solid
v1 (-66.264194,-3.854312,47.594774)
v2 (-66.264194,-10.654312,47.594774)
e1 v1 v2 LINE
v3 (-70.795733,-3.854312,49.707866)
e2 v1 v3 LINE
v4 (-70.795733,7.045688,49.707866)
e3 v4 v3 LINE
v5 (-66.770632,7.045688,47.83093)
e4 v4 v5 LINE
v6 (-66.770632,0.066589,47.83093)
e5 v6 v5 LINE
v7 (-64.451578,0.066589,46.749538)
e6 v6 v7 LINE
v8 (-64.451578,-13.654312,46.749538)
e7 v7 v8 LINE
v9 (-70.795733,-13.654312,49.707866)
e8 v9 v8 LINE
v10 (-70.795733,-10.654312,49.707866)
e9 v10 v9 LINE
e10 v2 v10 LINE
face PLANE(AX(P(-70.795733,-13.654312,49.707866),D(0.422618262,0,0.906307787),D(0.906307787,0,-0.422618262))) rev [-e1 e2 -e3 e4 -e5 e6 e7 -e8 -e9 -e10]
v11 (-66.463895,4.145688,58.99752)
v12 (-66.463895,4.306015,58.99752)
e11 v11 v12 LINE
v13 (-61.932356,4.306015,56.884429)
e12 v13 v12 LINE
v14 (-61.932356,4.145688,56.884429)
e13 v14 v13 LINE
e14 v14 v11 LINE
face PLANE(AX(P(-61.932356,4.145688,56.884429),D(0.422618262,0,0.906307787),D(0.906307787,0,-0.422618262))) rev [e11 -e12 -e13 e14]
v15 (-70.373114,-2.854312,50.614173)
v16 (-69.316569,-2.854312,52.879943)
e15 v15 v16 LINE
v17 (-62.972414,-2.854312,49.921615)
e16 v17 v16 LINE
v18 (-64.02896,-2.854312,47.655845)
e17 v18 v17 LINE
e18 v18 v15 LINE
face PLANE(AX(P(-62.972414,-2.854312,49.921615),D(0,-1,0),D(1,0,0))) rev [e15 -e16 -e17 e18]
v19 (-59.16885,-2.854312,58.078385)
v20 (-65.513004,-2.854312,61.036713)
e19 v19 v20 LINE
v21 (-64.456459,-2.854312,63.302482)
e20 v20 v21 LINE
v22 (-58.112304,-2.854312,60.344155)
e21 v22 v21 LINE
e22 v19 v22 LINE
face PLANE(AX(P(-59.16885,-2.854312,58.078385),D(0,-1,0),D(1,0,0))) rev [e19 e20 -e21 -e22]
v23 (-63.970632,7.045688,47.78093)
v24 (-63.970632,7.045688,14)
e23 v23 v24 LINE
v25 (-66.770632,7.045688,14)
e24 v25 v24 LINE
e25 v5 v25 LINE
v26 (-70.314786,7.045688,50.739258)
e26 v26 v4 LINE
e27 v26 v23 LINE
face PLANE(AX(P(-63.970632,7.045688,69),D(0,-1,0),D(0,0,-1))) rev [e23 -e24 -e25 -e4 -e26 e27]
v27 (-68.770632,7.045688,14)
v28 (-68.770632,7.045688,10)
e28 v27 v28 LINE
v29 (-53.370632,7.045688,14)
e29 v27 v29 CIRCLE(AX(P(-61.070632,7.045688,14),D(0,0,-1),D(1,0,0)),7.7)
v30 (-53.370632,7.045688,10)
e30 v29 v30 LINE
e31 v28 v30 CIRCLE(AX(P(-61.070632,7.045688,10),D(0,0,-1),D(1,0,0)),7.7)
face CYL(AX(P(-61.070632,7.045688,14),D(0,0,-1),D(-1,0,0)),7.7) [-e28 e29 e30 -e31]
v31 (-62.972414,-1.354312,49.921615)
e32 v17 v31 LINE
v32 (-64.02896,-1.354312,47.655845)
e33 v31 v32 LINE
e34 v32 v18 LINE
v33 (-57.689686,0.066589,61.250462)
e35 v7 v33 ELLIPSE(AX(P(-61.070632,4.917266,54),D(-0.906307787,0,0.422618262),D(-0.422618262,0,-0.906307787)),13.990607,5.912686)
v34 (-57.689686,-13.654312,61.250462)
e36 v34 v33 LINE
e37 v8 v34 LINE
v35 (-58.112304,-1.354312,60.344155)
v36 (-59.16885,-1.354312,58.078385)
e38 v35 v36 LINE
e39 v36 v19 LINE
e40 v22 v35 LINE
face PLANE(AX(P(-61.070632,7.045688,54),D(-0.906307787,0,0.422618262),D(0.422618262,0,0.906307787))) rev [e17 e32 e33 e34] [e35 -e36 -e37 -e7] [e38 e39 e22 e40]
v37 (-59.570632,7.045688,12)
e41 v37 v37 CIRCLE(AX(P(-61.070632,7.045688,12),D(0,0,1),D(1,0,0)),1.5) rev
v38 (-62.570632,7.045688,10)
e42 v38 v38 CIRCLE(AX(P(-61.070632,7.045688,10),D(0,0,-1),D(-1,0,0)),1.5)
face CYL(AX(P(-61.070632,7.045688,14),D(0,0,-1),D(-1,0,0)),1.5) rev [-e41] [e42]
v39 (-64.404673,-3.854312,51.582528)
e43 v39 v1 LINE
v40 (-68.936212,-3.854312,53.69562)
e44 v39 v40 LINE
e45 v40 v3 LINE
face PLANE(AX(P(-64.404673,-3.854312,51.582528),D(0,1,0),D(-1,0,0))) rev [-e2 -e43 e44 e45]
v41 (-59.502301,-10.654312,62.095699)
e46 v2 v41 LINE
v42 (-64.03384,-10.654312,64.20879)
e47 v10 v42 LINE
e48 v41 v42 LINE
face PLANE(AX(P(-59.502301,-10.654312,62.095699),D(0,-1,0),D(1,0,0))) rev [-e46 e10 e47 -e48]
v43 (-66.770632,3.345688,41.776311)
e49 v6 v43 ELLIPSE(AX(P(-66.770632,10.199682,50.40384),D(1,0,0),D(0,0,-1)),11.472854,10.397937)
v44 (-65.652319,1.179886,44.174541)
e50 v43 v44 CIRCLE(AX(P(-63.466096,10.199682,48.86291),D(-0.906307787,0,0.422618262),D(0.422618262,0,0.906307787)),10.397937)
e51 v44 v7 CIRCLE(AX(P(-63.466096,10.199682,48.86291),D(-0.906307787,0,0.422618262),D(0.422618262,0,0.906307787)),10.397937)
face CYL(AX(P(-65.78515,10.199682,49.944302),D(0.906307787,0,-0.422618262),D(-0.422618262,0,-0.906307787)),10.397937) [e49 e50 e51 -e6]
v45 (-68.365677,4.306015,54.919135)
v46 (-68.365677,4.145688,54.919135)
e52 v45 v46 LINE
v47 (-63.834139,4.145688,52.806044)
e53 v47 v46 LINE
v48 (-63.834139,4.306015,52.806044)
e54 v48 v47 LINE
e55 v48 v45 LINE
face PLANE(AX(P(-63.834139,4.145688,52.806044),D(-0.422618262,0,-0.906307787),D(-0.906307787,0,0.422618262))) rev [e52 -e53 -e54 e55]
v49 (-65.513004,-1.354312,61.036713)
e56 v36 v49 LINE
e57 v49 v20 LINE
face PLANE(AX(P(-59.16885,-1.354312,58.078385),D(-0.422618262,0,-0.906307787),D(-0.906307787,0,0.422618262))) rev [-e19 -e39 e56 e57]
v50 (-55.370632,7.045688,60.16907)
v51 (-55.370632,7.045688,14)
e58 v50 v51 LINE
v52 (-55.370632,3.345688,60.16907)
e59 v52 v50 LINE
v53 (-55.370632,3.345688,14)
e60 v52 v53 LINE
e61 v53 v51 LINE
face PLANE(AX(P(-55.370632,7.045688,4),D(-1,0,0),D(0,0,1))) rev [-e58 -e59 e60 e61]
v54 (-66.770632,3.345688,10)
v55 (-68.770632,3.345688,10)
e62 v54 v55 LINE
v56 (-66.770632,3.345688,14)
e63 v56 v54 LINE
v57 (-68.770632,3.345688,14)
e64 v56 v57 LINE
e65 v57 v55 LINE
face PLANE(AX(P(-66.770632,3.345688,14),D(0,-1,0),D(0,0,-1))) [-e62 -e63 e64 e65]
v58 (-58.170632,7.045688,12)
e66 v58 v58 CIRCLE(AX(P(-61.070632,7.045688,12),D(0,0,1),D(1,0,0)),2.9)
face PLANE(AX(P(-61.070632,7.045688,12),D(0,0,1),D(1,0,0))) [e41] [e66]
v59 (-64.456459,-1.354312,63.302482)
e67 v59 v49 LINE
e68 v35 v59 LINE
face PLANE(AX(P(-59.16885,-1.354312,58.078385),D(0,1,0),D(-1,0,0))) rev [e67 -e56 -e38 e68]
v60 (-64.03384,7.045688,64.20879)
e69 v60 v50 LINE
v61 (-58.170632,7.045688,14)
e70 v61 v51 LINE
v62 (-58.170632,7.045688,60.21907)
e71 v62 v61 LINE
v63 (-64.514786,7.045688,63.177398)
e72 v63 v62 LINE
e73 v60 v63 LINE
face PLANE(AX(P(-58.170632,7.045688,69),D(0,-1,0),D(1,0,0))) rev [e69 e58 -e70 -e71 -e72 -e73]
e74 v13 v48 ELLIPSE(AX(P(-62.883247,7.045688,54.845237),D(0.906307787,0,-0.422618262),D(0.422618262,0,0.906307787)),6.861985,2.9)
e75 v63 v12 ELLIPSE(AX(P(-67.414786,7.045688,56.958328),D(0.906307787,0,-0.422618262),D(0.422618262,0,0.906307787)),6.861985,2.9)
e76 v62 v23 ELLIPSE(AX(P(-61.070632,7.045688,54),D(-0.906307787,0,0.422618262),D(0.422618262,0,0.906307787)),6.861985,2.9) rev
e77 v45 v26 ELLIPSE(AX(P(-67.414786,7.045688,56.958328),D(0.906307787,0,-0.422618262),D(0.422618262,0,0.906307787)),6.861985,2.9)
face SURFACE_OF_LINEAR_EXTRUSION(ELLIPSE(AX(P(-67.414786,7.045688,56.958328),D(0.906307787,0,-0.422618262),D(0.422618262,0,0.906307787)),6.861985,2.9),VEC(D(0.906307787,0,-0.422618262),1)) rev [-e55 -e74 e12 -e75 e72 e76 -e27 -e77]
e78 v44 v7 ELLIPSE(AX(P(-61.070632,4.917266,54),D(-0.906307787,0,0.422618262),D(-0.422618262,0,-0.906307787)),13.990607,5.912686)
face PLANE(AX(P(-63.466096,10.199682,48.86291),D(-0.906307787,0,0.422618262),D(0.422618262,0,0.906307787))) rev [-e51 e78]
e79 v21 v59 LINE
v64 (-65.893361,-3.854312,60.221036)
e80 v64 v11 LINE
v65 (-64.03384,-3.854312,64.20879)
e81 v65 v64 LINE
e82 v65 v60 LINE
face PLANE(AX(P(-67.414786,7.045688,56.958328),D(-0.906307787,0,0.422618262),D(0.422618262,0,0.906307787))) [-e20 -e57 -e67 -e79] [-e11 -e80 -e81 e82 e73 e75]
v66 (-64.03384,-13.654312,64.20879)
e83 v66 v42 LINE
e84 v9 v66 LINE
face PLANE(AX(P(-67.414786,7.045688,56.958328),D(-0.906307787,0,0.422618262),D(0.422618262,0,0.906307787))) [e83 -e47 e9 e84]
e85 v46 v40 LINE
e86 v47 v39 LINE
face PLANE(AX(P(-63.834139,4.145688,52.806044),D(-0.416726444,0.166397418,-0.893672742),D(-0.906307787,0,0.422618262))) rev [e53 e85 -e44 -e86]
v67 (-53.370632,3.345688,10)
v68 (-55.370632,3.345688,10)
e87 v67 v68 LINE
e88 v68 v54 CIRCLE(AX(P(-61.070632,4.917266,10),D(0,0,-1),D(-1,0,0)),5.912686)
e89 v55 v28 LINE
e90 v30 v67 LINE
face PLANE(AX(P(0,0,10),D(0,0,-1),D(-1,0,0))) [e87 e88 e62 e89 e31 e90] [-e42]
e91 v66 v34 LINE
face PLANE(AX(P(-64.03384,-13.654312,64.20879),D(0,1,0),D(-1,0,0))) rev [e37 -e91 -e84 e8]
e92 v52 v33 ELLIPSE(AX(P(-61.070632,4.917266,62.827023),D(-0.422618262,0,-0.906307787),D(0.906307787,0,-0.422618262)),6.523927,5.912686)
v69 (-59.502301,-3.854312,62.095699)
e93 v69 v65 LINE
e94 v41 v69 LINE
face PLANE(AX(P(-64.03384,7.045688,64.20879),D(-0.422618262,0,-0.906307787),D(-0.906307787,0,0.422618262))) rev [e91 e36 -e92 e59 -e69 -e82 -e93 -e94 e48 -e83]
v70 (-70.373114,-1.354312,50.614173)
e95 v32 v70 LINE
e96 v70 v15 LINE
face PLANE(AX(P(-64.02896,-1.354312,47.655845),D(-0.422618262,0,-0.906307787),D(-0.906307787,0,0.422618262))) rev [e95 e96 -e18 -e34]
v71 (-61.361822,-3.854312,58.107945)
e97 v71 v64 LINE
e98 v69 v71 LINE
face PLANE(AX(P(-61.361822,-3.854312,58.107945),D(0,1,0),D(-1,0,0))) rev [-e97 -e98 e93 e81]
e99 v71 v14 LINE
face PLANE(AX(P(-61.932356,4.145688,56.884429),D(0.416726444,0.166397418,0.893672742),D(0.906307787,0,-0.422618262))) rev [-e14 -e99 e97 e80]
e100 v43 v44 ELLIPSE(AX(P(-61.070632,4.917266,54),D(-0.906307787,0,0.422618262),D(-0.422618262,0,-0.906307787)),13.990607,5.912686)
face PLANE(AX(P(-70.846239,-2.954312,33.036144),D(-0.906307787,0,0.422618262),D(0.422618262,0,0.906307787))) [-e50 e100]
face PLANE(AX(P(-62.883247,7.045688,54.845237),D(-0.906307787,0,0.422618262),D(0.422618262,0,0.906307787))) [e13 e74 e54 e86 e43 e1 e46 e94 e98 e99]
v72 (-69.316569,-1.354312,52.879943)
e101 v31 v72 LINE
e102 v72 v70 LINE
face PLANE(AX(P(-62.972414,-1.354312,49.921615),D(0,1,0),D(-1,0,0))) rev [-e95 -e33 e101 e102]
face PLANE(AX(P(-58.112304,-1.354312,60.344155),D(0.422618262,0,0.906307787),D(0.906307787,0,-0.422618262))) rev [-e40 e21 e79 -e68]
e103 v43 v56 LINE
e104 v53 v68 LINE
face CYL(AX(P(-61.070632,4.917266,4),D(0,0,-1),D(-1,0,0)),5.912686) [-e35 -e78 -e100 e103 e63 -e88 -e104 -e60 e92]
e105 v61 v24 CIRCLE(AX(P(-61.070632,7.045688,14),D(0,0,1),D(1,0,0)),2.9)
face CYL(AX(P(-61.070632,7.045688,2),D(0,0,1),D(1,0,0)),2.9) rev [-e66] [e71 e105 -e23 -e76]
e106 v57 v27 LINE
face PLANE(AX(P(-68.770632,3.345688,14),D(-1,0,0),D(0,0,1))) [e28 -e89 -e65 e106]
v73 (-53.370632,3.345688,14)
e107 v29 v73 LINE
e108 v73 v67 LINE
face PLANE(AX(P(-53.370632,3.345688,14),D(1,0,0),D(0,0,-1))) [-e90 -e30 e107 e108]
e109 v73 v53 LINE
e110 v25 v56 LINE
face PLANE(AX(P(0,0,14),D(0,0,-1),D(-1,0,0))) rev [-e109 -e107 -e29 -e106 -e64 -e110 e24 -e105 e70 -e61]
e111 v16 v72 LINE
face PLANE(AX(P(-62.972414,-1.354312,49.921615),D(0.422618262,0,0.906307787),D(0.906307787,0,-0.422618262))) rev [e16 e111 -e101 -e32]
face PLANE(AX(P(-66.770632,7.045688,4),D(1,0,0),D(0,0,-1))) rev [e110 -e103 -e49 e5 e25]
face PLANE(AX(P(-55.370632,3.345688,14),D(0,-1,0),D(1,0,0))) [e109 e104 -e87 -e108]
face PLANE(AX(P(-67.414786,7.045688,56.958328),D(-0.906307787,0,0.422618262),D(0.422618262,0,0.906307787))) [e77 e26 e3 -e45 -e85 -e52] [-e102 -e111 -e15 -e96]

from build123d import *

# Parameters (mm, degrees)
CROQUIS1_R                = 1.5
SALIENTE_EXTRUIR1_DEPTH   = 4
CROQUIS2_R                = 2.9
CORTAR_EXTRUIR1_DEPTH     = 2
SALIENTE_EXTRUIR2_DEPTH   = 65
CORTAR_EXTRUIR2_OUTLINE_W = 7.281077338
CORTAR_EXTRUIR2_OUTLINE_H = 8.780929931
CORTAR_EXTRUIR2_DEPTH     = 8.6
CORTAR_EXTRUIR2_TAPER     = -65
CROQUIS5_W                = 41.142355125
CROQUIS5_H                = 35.377069929
CORTAR_EXTRUIR3_DEPTH     = 10
SALIENTE_EXTRUIR3_DEPTH   = 7
CORTAR_EXTRUIR4_DEPTH     = 5
CORTAR_EXTRUIR5_START     = -7
CROQUIS8_W                = 2.5
CROQUIS8_H                = 1.5
CORTAR_EXTRUIR5_DEPTH     = 7
CORTAR_EXTRUIR6_DEPTH     = 10
SALIENTE_EXTRUIR4_DEPTH   = 3.7
SALIENTE_EXTRUIR5_DEPTH   = 2.558793
CORTAR_EXTRUIR7_DEPTH     = 10
CROQUIS14_W               = 20.903204772
CROQUIS14_H               = 28.789293723
CORTAR_EXTRUIR8_DEPTH     = 10
SALIENTE_EXTRUIR6_START   = -4
CROQUIS15_R               = 1.5
SALIENTE_EXTRUIR6_DEPTH   = 4
CROQUIS16_R               = 2.9
CORTAR_EXTRUIR9_DEPTH     = 2
SALIENTE_EXTRUIR7_START   = -4
SALIENTE_EXTRUIR7_DEPTH   = 4


# Read off the part's stored shape, not the designer's step: Cortar-Extruir2
with BuildPart() as part:
    # Croquis1 → Saliente-Extruir1 (new body)
    with BuildSketch(Plane.XY):
        with BuildLine():
            Line((-55.370631899, 7.045687646), (-55.370631899, 3.345687646))
            ThreePointArc((-55.370631899, 3.345687646), (-61.070631899, -0.995420457), (-66.770631899, 3.345687646))
            Line((-66.770631899, 3.345687646), (-66.770631899, 7.045687646))
            ThreePointArc((-66.770631899, 7.045687646), (-61.070631899, 12.745687646), (-55.370631899, 7.045687646))
        make_face()
        with Locations((-61.070631899, 7.045687646)):
            Circle(CROQUIS1_R, mode=Mode.SUBTRACT)
    extrude(amount=SALIENTE_EXTRUIR1_DEPTH)

    # Croquis2 → Cortar-Extruir1 (cut)
    with BuildSketch(Plane.XY.offset(4)):
        with Locations((-61.070631899, 7.045687646)):
            Circle(CROQUIS2_R)
    extrude(amount=-CORTAR_EXTRUIR1_DEPTH, mode=Mode.SUBTRACT)

    # Croquis3 → Saliente-Extruir2 (add)
    with BuildSketch(Plane.XY.offset(4)):
        with BuildLine():
            Line((-63.970631899, 7.045687646), (-66.770631899, 7.045687646))
            Line((-66.770631899, 7.045687646), (-66.770631899, 3.345687646))
            ThreePointArc((-66.770631899, 3.345687646), (-61.070631899, -0.995420457), (-55.370631899, 3.345687646))
            Line((-55.370631899, 3.345687646), (-55.370631899, 7.045687646))
            Line((-55.370631899, 7.045687646), (-58.170631899, 7.045687646))
            ThreePointArc((-58.170631899, 7.045687646), (-61.070631899, 4.145687646), (-63.970631899, 7.045687646))
        make_face()
    extrude(amount=SALIENTE_EXTRUIR2_DEPTH)

    # Cortar-Extruir2 outline → Cortar-Extruir2 (cut)
    with BuildSketch(Plane.YZ.offset(-58.170631899)):
        with Locations((3.405148977, 64.609535034)):
            Rectangle(CORTAR_EXTRUIR2_OUTLINE_W, CORTAR_EXTRUIR2_OUTLINE_H)
    extrude(amount=-CORTAR_EXTRUIR2_DEPTH, taper=CORTAR_EXTRUIR2_TAPER, mode=Mode.SUBTRACT)

    # Croquis5 → Cortar-Extruir3 (cut)
    with BuildSketch(Plane(origin=(-70.846238664, 0, 33.03614364), x_dir=(0.422618261740701, 0, 0.9063077870366493), z_dir=(-0.9063077870366493, 1.4037441023509523e-15, 0.422618261740701))):
        with Locations((23.845262034, -3.548141358)):
            Rectangle(CROQUIS5_W, CROQUIS5_H)
    extrude(amount=CORTAR_EXTRUIR3_DEPTH, mode=Mode.SUBTRACT)

    # Croquis6 → Saliente-Extruir3 (add)
    with BuildSketch(Plane(origin=(-70.846238664, 0, 33.03614364), x_dir=(0.422618261740701, 0, 0.9063077870366493), z_dir=(-0.9063077870366493, 1.4037441023509523e-15, 0.422618261740701))):
        with BuildLine():
            Line((31.131056203, 7.045687646), (29.993040795, 7.045687646))
            add(Edge.make_bspline(
                [(16.269071612, 7.045687646), (16.269071612, 4.145687646), (23.131056203, 4.145687646), (29.993040795, 4.145687646), (29.993040795, 7.045687646)],
                knots=[3.141592654, 3.141592654, 3.141592654, 4.71238898, 4.71238898, 6.283185307, 6.283185307, 6.283185307], degree=2, weights=[1, 0.707106781, 1, 0.707106781, 1]))
            Line((16.269071612, 7.045687646), (15.131056203, 7.045687646))
            Line((15.131056203, 7.045687646), (15.131056203, -13.654312354))
            Line((15.131056203, -13.654312354), (31.131056203, -13.654312354))
            Line((31.131056203, -13.654312354), (31.131056203, 7.045687646))
        make_face()
    extrude(amount=SALIENTE_EXTRUIR3_DEPTH)

    # Croquis7 → Cortar-Extruir4 (cut)
    with BuildSketch(Plane(origin=(-77.190393173, 0, 35.994471473), x_dir=(0.42261826174070094, 0, 0.9063077870366492), z_dir=(-0.9063077870366493, 1.403744102350952e-15, 0.422618261740701))):
        with BuildLine():
            Line((25.381056203, 4.145687646), (26.731056203, -3.854312354))
            Line((26.731056203, -3.854312354), (31.131056203, -3.854312354))
            Line((31.131056203, -3.854312354), (31.131056203, -10.654312354))
            Line((31.131056203, -10.654312354), (15.131056203, -10.654312354))
            Line((15.131056203, -10.654312354), (15.131056203, -3.854312354))
            Line((15.131056203, -3.854312354), (19.531056203, -3.854312354))
            Line((19.531056203, -3.854312354), (20.881056203, 4.145687646))
            Line((20.881056203, 4.145687646), (20.881056203, 4.306015013))
            add(Edge.make_bspline(
                [(20.881056203, 4.306015013), (23.131056203, 3.97597782), (25.381056203, 4.306015013)],
                knots=[4.378316067, 4.378316067, 4.378316067, 5.046461894, 5.046461894, 5.046461894], degree=2, weights=[1, 0.944714701, 1]))
            Line((25.381056203, 4.306015013), (25.381056203, 4.145687646))
        make_face()
    extrude(amount=-CORTAR_EXTRUIR4_DEPTH, mode=Mode.SUBTRACT)

    # Croquis8 → Cortar-Extruir5 (cut)
    with BuildSketch(Plane(origin=(-77.190393173, 0, 35.994471473), x_dir=(0.42261826174070094, 0, 0.9063077870366492), z_dir=(-0.9063077870366493, 1.403744102350952e-15, 0.422618261740701)).offset(CORTAR_EXTRUIR5_START)):
        with Locations((17.381056203, -2.104312354)):
            Rectangle(CROQUIS8_W, CROQUIS8_H)
        with Locations((28.881056203, -2.104312354)):
            Rectangle(CROQUIS8_W, CROQUIS8_H)
    extrude(amount=CORTAR_EXTRUIR5_DEPTH, mode=Mode.SUBTRACT)

    # Croquis9 → Cortar-Extruir6 (cut)
    with BuildSketch(Plane(origin=(0, 7.045687646, 0), x_dir=(1, 0, 0), z_dir=(0, 1, 0))):
        Polygon((-57.689685805, -61.250462296), (-55.370631899, -60.1690697), (-55.370631899, -66.223689447), align=None)
    extrude(amount=-CORTAR_EXTRUIR6_DEPTH, mode=Mode.SUBTRACT)

    # Croquis10 → Saliente-Extruir4 (add)
    with BuildSketch(Plane(origin=(0, 7.045687646, 0), x_dir=(1, 0, 0), z_dir=(0, 1, 0))):
        Polygon((-66.770631899, -41.776310553), (-66.770631899, -47.8309303), (-64.451577993, -46.749537704), align=None)
    extrude(amount=-SALIENTE_EXTRUIR4_DEPTH)

    # Croquis12 → Saliente-Extruir5 (add)
    with BuildSketch(Plane(origin=(-70.846238664, 0, 33.03614364), x_dir=(0.422618261740701, 0, 0.9063077870366493), z_dir=(-0.9063077870366493, 1.4037441023509523e-15, 0.422618261740701))):
        with BuildLine():
            Line((15.131056203, 3.345687646), (15.131056203, 0.066589345))
            ThreePointArc((15.131056203, 0.066589345), (12.129139109, 1.273987016), (9.64370718, 3.345687646))
            Line((9.64370718, 3.345687646), (15.131056203, 3.345687646))
        make_face()
    extrude(amount=SALIENTE_EXTRUIR5_DEPTH)

    # Croquis13 → Cortar-Extruir7 (cut)
    with BuildSketch(Plane(origin=(0, 3.345687646, 0), x_dir=(1, 0, 0), z_dir=(0, 1, 0))):
        Polygon((-66.770631899, -47.8309303), (-66.770631899, -41.776310553), (-69.089685805, -42.857703149), align=None)
    extrude(amount=-CORTAR_EXTRUIR7_DEPTH, mode=Mode.SUBTRACT)

    # Croquis14 → Cortar-Extruir8 (cut)
    with BuildSketch(Plane(origin=(0, 0, 0), x_dir=(-1, 0, 0), z_dir=(0, 0, -1))):
        with Locations((60.961327713, 6.880035774)):
            Rectangle(CROQUIS14_W, CROQUIS14_H)
    extrude(amount=-CORTAR_EXTRUIR8_DEPTH, mode=Mode.SUBTRACT)

    # Croquis15 → Saliente-Extruir6 (add)
    with BuildSketch(Plane(origin=(0, 0, 10), x_dir=(-1, 0, 0), z_dir=(0, 0, -1)).offset(SALIENTE_EXTRUIR6_START)):
        with BuildLine():
            ThreePointArc((55.370631899, 7.045687646), (61.070631899, 12.745687646), (66.770631899, 7.045687646))
            Line((66.770631899, 7.045687646), (63.970631899, 7.045687646))
            ThreePointArc((63.970631899, 7.045687646), (61.070631899, 4.145687646), (58.170631899, 7.045687646))
            Line((58.170631899, 7.045687646), (55.370631899, 7.045687646))
        make_face()
        with Locations((61.070631899, 7.045687646)):
            Circle(CROQUIS15_R, mode=Mode.SUBTRACT)
    extrude(amount=SALIENTE_EXTRUIR6_DEPTH)

    # Croquis16 → Cortar-Extruir9 (cut)
    with BuildSketch(Plane.XY.offset(14)):
        with Locations((-61.070631899, 7.045687646)):
            Circle(CROQUIS16_R)
    extrude(amount=-CORTAR_EXTRUIR9_DEPTH, mode=Mode.SUBTRACT)

    # Croquis17 → Saliente-Extruir7 (add)
    with BuildSketch(Plane(origin=(0, 0, 10), x_dir=(-1, 0, 0), z_dir=(0, 0, -1)).offset(SALIENTE_EXTRUIR7_START)):
        with BuildLine():
            Line((55.370631899, 3.345687646), (53.370631899, 3.345687646))
            Line((53.370631899, 3.345687646), (53.370631899, 7.045687646))
            ThreePointArc((53.370631899, 7.045687646), (61.070631899, 14.745687646), (68.770631899, 7.045687646))
            Line((68.770631899, 7.045687646), (68.770631899, 3.345687646))
            Line((68.770631899, 3.345687646), (66.770631899, 3.345687646))
            Line((66.770631899, 3.345687646), (66.770631899, 7.045687646))
            ThreePointArc((66.770631899, 7.045687646), (61.070631899, 12.745687646), (55.370631899, 7.045687646))
            Line((55.370631899, 7.045687646), (55.370631899, 3.345687646))
        make_face()
    extrude(amount=SALIENTE_EXTRUIR7_DEPTH)


solid = part.part
